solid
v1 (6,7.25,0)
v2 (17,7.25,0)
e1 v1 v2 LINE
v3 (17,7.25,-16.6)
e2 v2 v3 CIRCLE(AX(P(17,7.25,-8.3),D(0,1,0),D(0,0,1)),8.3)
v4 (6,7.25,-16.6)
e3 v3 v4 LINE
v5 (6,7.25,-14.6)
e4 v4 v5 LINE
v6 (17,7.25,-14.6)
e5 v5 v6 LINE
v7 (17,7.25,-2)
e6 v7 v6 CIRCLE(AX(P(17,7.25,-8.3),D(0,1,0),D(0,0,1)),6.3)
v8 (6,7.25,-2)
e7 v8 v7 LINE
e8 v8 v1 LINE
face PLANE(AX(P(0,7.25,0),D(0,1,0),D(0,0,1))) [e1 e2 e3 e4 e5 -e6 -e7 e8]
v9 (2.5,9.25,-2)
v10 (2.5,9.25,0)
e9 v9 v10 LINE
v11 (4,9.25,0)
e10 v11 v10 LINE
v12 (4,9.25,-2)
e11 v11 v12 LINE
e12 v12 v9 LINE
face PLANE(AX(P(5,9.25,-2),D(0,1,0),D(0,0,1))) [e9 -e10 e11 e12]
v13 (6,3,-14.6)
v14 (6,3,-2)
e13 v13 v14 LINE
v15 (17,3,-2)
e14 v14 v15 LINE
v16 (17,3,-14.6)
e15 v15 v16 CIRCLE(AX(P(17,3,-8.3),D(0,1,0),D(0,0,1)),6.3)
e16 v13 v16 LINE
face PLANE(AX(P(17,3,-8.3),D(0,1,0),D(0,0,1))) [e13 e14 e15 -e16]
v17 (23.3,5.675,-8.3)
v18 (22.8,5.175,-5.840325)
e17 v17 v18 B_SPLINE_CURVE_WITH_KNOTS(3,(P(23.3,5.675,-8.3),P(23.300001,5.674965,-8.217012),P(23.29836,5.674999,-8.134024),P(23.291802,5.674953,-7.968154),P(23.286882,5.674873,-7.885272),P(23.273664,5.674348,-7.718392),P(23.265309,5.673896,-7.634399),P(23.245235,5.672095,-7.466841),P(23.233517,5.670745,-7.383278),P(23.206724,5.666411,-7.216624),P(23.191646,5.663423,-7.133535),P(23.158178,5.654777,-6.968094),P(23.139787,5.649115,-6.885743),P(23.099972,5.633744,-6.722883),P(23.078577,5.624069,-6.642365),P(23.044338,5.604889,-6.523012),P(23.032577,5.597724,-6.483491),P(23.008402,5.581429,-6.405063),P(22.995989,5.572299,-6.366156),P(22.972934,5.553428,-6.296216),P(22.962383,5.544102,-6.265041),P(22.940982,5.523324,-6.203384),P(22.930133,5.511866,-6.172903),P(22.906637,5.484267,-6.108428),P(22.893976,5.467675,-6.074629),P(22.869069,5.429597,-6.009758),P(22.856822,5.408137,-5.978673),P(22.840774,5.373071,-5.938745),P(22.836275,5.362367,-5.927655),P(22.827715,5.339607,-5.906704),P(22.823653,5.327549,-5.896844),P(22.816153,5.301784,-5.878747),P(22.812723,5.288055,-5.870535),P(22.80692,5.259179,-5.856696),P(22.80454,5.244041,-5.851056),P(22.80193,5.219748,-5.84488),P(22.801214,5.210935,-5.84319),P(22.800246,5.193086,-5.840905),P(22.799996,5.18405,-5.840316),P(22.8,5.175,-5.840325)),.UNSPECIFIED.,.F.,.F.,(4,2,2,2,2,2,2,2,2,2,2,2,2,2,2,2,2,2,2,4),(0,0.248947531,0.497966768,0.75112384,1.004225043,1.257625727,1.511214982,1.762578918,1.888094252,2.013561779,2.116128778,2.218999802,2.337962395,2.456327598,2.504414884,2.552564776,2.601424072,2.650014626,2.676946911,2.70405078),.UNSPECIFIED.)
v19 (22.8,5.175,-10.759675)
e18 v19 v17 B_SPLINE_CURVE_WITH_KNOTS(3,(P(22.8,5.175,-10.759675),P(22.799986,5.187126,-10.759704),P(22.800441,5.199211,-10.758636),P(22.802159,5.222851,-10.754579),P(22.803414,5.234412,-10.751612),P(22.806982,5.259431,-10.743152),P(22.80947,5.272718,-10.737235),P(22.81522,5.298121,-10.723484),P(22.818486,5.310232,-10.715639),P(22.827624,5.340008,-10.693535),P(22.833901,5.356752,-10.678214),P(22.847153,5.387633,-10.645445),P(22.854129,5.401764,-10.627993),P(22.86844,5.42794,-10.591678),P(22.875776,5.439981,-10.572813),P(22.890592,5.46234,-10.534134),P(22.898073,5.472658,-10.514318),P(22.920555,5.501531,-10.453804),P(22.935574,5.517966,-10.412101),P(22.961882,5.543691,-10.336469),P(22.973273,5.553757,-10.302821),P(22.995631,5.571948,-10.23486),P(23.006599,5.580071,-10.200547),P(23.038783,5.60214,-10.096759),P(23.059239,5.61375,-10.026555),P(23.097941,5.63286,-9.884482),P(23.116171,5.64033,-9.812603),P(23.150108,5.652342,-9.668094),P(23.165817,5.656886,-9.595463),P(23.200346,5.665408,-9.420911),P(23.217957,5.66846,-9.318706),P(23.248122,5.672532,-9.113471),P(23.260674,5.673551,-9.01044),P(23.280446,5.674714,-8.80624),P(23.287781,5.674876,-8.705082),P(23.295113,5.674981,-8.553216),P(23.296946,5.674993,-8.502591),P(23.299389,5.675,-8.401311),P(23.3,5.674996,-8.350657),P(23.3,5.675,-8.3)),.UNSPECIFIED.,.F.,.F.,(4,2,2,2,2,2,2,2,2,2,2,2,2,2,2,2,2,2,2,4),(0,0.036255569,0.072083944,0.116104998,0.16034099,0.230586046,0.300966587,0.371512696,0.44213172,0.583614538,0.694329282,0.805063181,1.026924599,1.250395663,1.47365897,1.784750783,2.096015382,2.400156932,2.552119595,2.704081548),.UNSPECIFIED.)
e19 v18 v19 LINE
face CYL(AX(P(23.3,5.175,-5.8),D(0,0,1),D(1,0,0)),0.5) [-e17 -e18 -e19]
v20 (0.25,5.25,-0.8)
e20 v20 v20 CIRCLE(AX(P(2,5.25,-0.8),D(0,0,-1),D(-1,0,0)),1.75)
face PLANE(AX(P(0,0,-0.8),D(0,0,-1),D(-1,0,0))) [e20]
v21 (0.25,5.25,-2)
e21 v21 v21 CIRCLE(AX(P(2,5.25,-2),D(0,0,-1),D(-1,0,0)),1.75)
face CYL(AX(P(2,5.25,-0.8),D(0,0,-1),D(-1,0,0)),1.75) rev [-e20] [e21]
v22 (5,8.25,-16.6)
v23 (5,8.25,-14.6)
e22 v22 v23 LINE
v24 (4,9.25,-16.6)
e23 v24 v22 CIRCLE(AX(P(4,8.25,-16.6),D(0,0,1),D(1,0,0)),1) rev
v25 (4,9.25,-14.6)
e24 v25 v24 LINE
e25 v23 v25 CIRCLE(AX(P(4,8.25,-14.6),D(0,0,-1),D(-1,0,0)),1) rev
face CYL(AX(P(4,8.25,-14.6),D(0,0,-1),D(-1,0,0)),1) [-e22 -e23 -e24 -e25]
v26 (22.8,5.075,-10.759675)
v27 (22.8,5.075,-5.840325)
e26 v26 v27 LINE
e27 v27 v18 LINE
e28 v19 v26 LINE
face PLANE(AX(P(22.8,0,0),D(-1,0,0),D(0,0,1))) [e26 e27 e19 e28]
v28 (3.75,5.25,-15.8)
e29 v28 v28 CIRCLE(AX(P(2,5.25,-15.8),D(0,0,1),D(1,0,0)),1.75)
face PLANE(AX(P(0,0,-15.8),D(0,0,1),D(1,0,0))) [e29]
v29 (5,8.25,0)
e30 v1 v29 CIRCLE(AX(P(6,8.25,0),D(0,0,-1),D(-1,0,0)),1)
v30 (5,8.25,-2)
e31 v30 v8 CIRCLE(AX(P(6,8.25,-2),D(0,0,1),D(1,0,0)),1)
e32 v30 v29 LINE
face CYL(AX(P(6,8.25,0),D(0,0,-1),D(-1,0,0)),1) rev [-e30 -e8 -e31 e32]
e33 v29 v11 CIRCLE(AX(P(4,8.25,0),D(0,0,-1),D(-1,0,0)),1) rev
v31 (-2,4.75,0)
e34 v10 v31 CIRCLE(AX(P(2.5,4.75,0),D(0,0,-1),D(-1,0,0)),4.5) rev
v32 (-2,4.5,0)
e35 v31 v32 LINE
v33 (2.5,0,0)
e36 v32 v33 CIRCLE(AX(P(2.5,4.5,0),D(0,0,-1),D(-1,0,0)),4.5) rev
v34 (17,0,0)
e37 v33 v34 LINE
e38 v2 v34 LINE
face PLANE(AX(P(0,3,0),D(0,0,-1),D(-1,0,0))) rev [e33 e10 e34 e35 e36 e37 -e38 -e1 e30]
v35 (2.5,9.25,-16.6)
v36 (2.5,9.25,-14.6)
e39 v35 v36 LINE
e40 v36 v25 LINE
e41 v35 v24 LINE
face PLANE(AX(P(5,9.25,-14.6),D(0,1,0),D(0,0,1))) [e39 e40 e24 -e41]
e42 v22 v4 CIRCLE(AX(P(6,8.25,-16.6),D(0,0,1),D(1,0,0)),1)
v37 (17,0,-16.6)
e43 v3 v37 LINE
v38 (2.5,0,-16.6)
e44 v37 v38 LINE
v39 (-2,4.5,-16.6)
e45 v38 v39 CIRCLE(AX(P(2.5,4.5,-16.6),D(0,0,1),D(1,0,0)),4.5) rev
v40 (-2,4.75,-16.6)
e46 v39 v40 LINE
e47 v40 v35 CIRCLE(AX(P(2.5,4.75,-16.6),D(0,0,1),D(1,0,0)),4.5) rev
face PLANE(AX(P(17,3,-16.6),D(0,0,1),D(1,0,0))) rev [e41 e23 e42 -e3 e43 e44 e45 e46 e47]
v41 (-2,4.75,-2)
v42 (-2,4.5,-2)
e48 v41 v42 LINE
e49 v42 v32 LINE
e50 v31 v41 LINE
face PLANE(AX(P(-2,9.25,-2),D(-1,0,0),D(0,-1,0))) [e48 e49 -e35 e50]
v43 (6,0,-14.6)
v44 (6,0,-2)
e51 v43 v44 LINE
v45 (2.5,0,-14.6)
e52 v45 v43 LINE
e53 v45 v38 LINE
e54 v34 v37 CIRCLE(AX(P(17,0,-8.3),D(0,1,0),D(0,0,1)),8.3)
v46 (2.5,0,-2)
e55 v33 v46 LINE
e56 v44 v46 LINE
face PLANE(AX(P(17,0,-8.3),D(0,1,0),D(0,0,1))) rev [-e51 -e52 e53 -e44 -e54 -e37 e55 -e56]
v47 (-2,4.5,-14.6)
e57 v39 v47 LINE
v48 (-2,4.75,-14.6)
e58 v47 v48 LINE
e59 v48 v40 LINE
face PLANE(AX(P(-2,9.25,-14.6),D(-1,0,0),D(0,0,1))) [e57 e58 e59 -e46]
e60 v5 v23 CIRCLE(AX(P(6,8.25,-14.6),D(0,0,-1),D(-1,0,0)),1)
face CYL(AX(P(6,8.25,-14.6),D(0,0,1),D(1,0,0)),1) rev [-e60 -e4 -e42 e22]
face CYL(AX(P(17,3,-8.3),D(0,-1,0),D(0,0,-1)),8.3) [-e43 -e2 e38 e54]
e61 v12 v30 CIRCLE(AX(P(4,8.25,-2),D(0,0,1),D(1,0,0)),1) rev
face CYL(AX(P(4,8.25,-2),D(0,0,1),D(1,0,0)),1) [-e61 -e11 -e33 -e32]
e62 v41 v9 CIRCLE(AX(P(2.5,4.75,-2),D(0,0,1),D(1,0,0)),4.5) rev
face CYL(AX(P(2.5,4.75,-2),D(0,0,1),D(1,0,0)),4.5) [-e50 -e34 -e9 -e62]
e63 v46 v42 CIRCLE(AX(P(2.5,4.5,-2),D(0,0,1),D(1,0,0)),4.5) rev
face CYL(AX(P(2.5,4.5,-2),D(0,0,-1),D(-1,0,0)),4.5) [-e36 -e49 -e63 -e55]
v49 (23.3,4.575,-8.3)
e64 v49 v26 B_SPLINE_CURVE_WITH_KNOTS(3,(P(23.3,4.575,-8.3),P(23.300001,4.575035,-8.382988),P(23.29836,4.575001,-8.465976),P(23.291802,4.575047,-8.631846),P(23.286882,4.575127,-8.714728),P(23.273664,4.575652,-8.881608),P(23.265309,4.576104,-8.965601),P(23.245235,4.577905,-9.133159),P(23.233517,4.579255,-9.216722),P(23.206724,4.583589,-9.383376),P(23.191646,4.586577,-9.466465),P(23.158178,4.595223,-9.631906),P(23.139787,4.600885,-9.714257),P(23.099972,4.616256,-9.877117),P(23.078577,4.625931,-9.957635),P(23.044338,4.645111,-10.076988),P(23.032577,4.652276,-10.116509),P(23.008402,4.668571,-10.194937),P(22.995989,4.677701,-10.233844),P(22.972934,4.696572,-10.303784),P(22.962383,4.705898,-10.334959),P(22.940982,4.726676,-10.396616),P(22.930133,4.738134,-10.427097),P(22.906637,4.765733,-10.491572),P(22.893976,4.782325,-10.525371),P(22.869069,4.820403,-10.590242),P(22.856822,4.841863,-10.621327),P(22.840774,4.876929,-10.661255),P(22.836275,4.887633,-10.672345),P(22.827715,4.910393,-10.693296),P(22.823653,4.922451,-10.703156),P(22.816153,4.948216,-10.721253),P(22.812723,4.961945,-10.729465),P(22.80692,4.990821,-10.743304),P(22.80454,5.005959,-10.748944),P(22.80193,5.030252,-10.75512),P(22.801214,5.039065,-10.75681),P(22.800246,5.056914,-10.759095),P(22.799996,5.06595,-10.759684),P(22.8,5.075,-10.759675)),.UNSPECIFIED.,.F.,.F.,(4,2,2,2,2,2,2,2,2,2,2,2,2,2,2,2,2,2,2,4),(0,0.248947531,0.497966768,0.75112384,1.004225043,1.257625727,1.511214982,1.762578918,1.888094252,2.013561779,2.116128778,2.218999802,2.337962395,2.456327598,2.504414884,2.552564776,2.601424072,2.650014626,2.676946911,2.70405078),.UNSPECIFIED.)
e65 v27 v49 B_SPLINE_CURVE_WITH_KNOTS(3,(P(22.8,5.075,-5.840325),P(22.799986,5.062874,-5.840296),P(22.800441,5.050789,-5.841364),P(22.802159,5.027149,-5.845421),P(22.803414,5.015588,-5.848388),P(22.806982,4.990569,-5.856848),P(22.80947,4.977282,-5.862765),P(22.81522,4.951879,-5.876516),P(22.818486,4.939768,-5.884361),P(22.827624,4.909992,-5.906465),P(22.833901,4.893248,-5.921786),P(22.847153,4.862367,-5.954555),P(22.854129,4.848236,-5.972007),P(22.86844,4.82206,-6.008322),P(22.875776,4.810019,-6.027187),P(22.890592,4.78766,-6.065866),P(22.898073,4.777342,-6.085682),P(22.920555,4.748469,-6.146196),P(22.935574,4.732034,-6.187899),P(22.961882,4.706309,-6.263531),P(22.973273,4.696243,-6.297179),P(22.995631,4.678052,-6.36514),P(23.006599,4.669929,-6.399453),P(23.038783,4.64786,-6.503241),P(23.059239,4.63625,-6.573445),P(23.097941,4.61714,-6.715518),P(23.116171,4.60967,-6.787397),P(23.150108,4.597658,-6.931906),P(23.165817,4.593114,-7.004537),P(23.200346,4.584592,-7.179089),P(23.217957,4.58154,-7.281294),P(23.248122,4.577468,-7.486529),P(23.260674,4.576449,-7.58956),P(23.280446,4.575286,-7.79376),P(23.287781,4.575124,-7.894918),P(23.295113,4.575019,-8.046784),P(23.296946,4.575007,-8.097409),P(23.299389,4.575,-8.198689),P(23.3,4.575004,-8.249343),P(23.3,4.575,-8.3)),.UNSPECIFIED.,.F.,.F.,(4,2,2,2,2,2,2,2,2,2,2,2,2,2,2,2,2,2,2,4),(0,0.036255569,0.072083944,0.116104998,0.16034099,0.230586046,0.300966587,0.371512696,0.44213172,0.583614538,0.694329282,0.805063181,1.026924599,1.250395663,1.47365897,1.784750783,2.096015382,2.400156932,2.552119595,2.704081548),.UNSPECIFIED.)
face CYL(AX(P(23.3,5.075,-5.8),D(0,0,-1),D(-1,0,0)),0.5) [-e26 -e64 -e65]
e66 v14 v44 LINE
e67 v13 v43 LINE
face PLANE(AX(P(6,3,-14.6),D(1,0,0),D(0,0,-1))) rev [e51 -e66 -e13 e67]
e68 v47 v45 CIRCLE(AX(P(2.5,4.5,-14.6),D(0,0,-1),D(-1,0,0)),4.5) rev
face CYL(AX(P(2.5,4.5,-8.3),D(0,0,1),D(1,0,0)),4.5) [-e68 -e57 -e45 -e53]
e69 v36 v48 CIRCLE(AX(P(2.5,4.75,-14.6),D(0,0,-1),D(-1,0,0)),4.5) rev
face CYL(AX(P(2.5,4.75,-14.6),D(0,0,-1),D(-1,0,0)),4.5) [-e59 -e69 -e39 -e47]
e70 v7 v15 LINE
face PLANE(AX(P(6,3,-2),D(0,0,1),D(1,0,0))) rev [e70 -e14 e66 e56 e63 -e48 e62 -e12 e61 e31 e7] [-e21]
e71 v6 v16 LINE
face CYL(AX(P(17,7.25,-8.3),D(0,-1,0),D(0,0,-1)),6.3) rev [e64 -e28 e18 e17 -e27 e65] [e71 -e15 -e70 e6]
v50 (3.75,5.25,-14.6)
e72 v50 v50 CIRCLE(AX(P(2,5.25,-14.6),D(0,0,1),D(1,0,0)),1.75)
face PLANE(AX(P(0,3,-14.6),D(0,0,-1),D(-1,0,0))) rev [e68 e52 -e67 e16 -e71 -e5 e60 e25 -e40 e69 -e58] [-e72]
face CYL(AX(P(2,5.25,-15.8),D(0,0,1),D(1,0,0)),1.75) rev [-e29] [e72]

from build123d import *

# Parameters (mm, degrees)
BOSS_EXTRUDE1_DEPTH = 3
BOSS_EXTRUDE2_DEPTH = 4.25
CUT_EXTRUDE1_DEPTH  = 1.2
CUT_EXTRUDE2_START  = -1.2
CUT_EXTRUDE2_DEPTH  = 1.2
BOSS_EXTRUDE3_DEPTH = 2
BOSS_EXTRUDE4_DEPTH = 2
FILLET2_R           = 4.5
FILLET3_START       = -18
FILLET3_DEPTH       = 19
FILLET3_START_2     = -16.6
FILLET3_2_DEPTH     = 2
FILLET3_START_3     = -2
FILLET3_3_DEPTH     = 2
SKETCH7_W           = 5
SKETCH7_H           = 1.1
BOSS_EXTRUDE5_DEPTH = 0.7
FILLET4_R           = 0.5


with BuildPart() as part:
    # Sketch1 → Boss-Extrude1 (new body)
    with BuildSketch(Plane(origin=(0, 0, 0), x_dir=(1, 0, 0), z_dir=(0, 1, 0))):
        with BuildLine():
            Line((0, 0), (17, 0))
            ThreePointArc((17, 0), (25.3, 8.3), (17, 16.6))
            Line((17, 16.6), (0, 16.6))
            Line((0, 16.6), (0, 14.6))
            Line((0, 14.6), (6, 14.6))
            Line((6, 14.6), (6, 2))
            Line((6, 2), (0, 2))
            Line((0, 2), (0, 0))
        make_face()
    extrude(amount=BOSS_EXTRUDE1_DEPTH)

    # Sketch2 → Boss-Extrude2 (add)
    with BuildSketch(Plane(origin=(0, 3, 0), x_dir=(1, 0, 0), z_dir=(0, 1, 0))):
        with BuildLine():
            Line((6, 2), (0, 2))
            Line((0, 2), (0, 0))
            Line((0, 0), (17, 0))
            ThreePointArc((17, 0), (25.3, 8.3), (17, 16.6))
            Line((17, 16.6), (0, 16.6))
            Line((0, 16.6), (0, 14.6))
            Line((0, 14.6), (6, 14.6))
            Line((6, 14.6), (17, 14.6))
            ThreePointArc((17, 14.6), (23.3, 8.3), (17, 2))
            Line((17, 2), (6, 2))
        make_face()
    extrude(amount=BOSS_EXTRUDE2_DEPTH)

    # Sketch3 → Cut-Extrude1 (cut)
    with BuildSketch(Plane.XY.offset(-14.6)):
        with BuildLine():
            ThreePointArc((0.762563133, 6.487436867), (0.762563133, 4.012563133), (3.237436867, 4.012563133))
            Line((3.237436867, 4.012563133), (0.762563133, 6.487436867))
        make_face()
        with BuildLine():
            Line((0.762563133, 6.487436867), (3.237436867, 4.012563133))
            ThreePointArc((3.237436867, 4.012563133), (3.616789182, 4.580303993), (3.75, 5.25))
            ThreePointArc((3.75, 5.25), (2.669696007, 6.866789182), (0.762563133, 6.487436867))
        make_face()
    extrude(amount=-CUT_EXTRUDE1_DEPTH, mode=Mode.SUBTRACT)

    # Sketch4 → Cut-Extrude2 (cut)
    with BuildSketch(Plane(origin=(0, 0, -2), x_dir=(-1, 0, 0), z_dir=(0, 0, -1)).offset(CUT_EXTRUDE2_START)):
        with BuildLine():
            ThreePointArc((-0.25, 5.25), (-0.383210818, 5.919696007), (-0.762563133, 6.487436867))
            Line((-0.762563133, 6.487436867), (-3.237436867, 4.012563133))
            ThreePointArc((-3.237436867, 4.012563133), (-1.330303993, 3.633210818), (-0.25, 5.25))
        make_face()
        with BuildLine():
            Line((-3.237436867, 4.012563133), (-0.762563133, 6.487436867))
            ThreePointArc((-0.762563133, 6.487436867), (-3.237436867, 6.487436867), (-3.237436867, 4.012563133))
        make_face()
    extrude(amount=CUT_EXTRUDE2_DEPTH, mode=Mode.SUBTRACT)

    # Sketch5 → Boss-Extrude3 (add)
    with BuildSketch(Plane.XY):
        Polygon((5, 7.25), (5, 9.25), (-2, 9.25), (-2, 0), (0, 0), (0, 7.25), align=None)
    extrude(amount=-BOSS_EXTRUDE3_DEPTH)

    # Sketch6 → Boss-Extrude4 (add)
    with BuildSketch(Plane(origin=(0, 0, -16.6), x_dir=(-1, 0, 0), z_dir=(0, 0, -1))):
        Polygon((-5, 7.25), (-5, 9.25), (2, 9.25), (2, 0), (0, 0), (0, 7.25), align=None)
    extrude(amount=-BOSS_EXTRUDE4_DEPTH)

    # Fillet2
    fillet2_edges = [part.edges().sort_by_distance(p)[0] for p in [
        (-2, 0, -1),
        (-2, 9.25, -1),
        (-2, 9.25, -15.6),
        (-2, 0, -15.6),
    ]]
    fillet(fillet2_edges, radius=FILLET2_R)

    # Fillet3: read off the stored shape, not the designer's step
    # Fillet3 outline → Fillet3 (cut)
    with BuildSketch(Plane.XY.offset(FILLET3_START)):
        with BuildLine():
            Line((5, 9.25), (4, 9.25))
            ThreePointArc((4, 9.25), (4.707106781, 8.957106781), (5, 8.25))
            Line((5, 8.25), (5, 9.25))
        make_face()
    extrude(amount=FILLET3_DEPTH, mode=Mode.SUBTRACT)

    # Fillet3 2 outline → Fillet3 2 (add)
    with BuildSketch(Plane.XY.offset(FILLET3_START_2)):
        with BuildLine():
            ThreePointArc((6, 7.25), (5.292893219, 7.542893219), (5, 8.25))
            Line((5, 8.25), (5, 7.25))
            Line((5, 7.25), (6, 7.25))
        make_face()
    extrude(amount=FILLET3_2_DEPTH)

    # Fillet3 3 outline → Fillet3 3 (add)
    with BuildSketch(Plane.XY.offset(FILLET3_START_3)):
        with BuildLine():
            ThreePointArc((6, 7.25), (5.292893219, 7.542893219), (5, 8.25))
            Line((5, 8.25), (5, 7.25))
            Line((5, 7.25), (6, 7.25))
        make_face()
    extrude(amount=FILLET3_3_DEPTH)

    # Sketch7 → Boss-Extrude5 (add)
    with BuildSketch(Plane(origin=(23.5, 0, 0), x_dir=(0, 0, -1), z_dir=(1, 0, 0))):
        with Locations((8.3, 5.125)):
            Rectangle(SKETCH7_W, SKETCH7_H)
    extrude(amount=-BOSS_EXTRUDE5_DEPTH)

    # Fillet4
    fillet4_edges = [part.edges().sort_by_distance(p)[0] for p in [
        (22.8, 4.575, -8.3),
        (22.8, 5.675, -8.3),
    ]]
    fillet(fillet4_edges, radius=FILLET4_R - 0.0001)  # a hair under: the kernel refuses the full size


solid = part.part
